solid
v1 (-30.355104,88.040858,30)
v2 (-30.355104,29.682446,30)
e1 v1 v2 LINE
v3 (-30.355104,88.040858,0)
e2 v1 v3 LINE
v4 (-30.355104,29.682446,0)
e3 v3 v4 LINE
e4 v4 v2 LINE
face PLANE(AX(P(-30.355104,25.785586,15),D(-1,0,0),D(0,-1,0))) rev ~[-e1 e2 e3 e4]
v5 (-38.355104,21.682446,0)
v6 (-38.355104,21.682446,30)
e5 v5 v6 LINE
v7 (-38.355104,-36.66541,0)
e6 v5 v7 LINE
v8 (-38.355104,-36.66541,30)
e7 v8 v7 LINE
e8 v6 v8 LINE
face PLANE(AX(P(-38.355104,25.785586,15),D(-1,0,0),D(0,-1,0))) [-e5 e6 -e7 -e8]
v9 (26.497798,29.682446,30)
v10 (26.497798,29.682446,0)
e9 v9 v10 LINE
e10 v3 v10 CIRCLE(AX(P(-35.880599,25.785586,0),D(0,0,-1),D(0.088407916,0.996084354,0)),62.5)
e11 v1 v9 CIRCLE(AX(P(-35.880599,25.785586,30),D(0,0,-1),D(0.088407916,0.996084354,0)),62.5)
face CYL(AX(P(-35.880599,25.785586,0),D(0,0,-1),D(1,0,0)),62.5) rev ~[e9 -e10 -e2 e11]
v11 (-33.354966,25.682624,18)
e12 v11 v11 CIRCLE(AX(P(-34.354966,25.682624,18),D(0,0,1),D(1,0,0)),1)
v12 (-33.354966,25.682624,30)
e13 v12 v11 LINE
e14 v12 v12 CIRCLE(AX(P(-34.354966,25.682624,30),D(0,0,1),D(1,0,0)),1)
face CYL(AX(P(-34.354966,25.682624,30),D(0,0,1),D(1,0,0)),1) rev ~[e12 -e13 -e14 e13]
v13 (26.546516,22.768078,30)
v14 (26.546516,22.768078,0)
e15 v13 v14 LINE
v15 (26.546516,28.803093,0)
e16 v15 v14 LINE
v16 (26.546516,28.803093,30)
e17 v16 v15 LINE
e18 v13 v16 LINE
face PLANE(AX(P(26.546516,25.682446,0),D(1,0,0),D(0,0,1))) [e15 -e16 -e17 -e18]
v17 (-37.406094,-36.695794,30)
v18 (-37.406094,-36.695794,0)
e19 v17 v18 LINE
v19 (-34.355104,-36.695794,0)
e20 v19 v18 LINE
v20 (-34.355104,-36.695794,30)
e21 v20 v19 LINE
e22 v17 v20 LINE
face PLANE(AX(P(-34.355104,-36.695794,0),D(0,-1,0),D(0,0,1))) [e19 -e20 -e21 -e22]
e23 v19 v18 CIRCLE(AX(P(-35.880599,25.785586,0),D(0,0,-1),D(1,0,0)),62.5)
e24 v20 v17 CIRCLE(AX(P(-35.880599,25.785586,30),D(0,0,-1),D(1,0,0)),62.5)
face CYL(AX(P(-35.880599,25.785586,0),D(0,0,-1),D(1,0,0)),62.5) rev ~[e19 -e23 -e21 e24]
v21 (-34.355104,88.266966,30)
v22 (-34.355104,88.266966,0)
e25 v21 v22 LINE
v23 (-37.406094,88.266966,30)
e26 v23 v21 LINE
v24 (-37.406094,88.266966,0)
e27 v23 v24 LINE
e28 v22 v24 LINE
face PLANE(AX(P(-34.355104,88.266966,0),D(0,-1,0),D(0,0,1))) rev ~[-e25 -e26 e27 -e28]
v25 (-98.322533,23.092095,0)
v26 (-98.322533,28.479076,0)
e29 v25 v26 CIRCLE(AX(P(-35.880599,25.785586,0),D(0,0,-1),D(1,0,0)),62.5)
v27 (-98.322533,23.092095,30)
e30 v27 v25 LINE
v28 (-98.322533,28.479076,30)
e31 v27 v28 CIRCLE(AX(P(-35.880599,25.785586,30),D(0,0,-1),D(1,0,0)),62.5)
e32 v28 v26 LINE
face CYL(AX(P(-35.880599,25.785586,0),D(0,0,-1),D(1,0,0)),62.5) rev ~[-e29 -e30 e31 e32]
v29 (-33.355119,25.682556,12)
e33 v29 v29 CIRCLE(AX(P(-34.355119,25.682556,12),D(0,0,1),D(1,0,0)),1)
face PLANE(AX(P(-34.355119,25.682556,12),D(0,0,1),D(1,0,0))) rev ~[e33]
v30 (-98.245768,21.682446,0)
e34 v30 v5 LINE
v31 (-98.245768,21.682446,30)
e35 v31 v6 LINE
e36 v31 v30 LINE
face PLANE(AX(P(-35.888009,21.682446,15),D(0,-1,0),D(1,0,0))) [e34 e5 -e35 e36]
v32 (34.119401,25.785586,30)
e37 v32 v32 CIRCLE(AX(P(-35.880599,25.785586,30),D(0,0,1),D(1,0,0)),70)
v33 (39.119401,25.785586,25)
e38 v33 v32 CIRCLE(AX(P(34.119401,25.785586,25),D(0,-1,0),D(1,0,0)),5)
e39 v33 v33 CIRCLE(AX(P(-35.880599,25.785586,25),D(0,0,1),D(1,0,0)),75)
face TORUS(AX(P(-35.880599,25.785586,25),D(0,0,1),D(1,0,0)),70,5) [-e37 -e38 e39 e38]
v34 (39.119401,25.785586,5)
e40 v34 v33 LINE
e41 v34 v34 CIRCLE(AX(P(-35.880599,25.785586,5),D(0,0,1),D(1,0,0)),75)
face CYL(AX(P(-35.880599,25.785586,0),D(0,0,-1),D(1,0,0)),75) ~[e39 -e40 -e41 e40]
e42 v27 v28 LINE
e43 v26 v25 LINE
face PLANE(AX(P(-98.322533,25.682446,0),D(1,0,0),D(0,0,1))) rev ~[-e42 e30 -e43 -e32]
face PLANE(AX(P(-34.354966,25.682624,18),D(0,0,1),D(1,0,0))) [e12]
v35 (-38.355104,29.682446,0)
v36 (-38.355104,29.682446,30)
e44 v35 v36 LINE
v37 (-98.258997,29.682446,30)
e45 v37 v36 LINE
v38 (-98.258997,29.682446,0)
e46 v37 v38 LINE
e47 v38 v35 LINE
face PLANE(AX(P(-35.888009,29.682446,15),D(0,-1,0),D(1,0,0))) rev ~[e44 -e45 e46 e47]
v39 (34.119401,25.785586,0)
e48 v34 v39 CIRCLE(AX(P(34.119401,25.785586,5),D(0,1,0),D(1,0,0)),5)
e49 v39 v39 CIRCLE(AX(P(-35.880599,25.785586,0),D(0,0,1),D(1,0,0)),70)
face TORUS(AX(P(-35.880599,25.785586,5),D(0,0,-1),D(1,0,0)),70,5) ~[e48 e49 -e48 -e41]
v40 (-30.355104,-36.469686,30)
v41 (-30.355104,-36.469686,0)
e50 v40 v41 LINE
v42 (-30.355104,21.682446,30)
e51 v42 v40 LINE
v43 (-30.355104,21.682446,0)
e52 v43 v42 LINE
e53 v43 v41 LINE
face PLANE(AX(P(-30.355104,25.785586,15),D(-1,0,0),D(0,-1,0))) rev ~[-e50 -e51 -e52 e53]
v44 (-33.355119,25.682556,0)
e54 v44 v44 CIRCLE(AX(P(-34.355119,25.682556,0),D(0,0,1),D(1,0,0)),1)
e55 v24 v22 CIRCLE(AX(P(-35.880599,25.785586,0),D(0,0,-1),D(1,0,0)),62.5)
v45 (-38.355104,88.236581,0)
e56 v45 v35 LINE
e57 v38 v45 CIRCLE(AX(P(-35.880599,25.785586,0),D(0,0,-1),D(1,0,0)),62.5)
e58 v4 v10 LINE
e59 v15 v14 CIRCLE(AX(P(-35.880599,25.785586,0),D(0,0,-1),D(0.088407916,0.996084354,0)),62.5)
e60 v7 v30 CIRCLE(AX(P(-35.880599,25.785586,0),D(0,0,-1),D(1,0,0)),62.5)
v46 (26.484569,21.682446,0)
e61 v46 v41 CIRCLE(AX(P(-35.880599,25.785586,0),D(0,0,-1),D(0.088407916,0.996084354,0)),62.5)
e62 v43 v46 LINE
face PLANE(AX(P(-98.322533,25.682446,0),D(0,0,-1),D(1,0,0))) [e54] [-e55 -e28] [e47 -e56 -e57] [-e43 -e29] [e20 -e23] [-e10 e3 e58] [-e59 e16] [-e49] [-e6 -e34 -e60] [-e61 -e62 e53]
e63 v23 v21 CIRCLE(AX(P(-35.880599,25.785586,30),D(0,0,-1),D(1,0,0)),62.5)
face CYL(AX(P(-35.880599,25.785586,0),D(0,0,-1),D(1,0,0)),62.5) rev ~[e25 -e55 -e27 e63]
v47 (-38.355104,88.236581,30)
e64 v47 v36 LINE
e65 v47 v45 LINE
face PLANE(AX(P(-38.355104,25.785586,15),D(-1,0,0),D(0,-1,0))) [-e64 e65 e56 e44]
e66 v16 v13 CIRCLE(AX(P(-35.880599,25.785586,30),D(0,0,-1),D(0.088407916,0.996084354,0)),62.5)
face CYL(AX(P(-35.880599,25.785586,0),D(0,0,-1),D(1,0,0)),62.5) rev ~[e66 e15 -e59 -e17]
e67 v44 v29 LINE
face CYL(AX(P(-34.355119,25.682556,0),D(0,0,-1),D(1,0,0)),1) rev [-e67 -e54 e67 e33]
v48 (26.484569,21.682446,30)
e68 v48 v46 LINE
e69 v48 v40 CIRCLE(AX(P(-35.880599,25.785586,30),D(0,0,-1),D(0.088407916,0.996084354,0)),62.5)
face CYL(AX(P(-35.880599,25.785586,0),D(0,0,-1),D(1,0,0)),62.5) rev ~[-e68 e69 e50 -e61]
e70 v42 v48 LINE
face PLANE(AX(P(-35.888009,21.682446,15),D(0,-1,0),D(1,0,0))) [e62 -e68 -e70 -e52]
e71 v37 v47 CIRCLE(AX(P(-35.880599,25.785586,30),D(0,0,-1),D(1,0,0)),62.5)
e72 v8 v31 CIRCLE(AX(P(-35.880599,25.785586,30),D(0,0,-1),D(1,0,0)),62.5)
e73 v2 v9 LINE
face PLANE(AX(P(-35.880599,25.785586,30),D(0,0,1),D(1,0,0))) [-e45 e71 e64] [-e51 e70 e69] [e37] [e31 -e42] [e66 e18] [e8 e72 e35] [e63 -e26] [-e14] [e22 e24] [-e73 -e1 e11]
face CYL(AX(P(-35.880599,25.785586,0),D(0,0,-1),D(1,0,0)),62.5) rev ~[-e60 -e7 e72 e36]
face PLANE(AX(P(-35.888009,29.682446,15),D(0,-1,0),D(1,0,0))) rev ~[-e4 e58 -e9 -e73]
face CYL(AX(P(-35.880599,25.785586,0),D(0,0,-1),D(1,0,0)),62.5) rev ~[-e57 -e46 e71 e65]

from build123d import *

# Parameters (mm, degrees)
F0_R      = 75
F1_DEPTH  = 30
F2_R      = 5
F3_R      = 5
F4_R      = 62.5
F5_DEPTH  = 30
F7_E2_W   = 124.9627603046
F7_E2_H   = 30
F8_DEPTH  = 4
F10_E3_W  = 124.8690485954
F10_E3_H  = 30
F11_DEPTH = 4
F12_R     = 1
F13_DEPTH = 12
F14_R     = 1
F15_DEPTH = 12


with BuildPart() as f1:
    # F0 (on Top) → F1 (new body)
    with BuildSketch(Plane.XY):
        with Locations((-35.8805991709, 25.7855858654)):
            Circle(F0_R)
    extrude(amount=F1_DEPTH)

    # F2
    f2_edges = [f1.edges().sort_by_distance(p)[0] for p in [
        (-110.880599, 25.785586, 0),
    ]]
    fillet(f2_edges, radius=F2_R)

    # F3
    f3_edges = [f1.edges().sort_by_distance(p)[0] for p in [
        (-110.880599, 25.785586, 30),
    ]]
    fillet(f3_edges, radius=F3_R)

    # F4 (on face) → F5 (cut)
    with BuildSketch(Plane(origin=(0, 0, 0), x_dir=(1, 0, 0), z_dir=(0, 0, -1))):
        with Locations((-35.8805991709, -25.7855858654)):
            Circle(F4_R)
    extrude(amount=-F5_DEPTH, mode=Mode.SUBTRACT)

    # F7_E2 (on explicit) → F8 (join, symmetric)
    with BuildSketch(Plane(origin=(-34.3551044097, 88.2669660177, 0), x_dir=(0, -1, 0), z_dir=(-1, 0, 0))):
        with Locations((62.4813801523, 15)):
            Rectangle(F7_E2_W, F7_E2_H)
    extrude(amount=F8_DEPTH, both=True)

    # F10_E3 (on explicit) → F11 (join, symmetric)
    with BuildSketch(Plane(origin=(-98.322533071, 25.6824456155, 0), x_dir=(1, 0, 0), z_dir=(0, -1, 0))):
        with Locations((62.4345242977, 15)):
            Rectangle(F10_E3_W, F10_E3_H)
    extrude(amount=F11_DEPTH, both=True)

    # F12 (on face) → F13 (cut)
    with BuildSketch(Plane.XY.offset(30)):
        with Locations((-34.3549661338, 25.6826244295)):
            Circle(F12_R)
    extrude(amount=-F13_DEPTH, mode=Mode.SUBTRACT)

    # F14 (on Top) → F15 (cut)
    with BuildSketch(Plane.XY):
        with Locations((-34.3551188707, 25.6825555116)):
            Circle(F14_R)
    extrude(amount=F15_DEPTH, mode=Mode.SUBTRACT)


solid = f1.part
